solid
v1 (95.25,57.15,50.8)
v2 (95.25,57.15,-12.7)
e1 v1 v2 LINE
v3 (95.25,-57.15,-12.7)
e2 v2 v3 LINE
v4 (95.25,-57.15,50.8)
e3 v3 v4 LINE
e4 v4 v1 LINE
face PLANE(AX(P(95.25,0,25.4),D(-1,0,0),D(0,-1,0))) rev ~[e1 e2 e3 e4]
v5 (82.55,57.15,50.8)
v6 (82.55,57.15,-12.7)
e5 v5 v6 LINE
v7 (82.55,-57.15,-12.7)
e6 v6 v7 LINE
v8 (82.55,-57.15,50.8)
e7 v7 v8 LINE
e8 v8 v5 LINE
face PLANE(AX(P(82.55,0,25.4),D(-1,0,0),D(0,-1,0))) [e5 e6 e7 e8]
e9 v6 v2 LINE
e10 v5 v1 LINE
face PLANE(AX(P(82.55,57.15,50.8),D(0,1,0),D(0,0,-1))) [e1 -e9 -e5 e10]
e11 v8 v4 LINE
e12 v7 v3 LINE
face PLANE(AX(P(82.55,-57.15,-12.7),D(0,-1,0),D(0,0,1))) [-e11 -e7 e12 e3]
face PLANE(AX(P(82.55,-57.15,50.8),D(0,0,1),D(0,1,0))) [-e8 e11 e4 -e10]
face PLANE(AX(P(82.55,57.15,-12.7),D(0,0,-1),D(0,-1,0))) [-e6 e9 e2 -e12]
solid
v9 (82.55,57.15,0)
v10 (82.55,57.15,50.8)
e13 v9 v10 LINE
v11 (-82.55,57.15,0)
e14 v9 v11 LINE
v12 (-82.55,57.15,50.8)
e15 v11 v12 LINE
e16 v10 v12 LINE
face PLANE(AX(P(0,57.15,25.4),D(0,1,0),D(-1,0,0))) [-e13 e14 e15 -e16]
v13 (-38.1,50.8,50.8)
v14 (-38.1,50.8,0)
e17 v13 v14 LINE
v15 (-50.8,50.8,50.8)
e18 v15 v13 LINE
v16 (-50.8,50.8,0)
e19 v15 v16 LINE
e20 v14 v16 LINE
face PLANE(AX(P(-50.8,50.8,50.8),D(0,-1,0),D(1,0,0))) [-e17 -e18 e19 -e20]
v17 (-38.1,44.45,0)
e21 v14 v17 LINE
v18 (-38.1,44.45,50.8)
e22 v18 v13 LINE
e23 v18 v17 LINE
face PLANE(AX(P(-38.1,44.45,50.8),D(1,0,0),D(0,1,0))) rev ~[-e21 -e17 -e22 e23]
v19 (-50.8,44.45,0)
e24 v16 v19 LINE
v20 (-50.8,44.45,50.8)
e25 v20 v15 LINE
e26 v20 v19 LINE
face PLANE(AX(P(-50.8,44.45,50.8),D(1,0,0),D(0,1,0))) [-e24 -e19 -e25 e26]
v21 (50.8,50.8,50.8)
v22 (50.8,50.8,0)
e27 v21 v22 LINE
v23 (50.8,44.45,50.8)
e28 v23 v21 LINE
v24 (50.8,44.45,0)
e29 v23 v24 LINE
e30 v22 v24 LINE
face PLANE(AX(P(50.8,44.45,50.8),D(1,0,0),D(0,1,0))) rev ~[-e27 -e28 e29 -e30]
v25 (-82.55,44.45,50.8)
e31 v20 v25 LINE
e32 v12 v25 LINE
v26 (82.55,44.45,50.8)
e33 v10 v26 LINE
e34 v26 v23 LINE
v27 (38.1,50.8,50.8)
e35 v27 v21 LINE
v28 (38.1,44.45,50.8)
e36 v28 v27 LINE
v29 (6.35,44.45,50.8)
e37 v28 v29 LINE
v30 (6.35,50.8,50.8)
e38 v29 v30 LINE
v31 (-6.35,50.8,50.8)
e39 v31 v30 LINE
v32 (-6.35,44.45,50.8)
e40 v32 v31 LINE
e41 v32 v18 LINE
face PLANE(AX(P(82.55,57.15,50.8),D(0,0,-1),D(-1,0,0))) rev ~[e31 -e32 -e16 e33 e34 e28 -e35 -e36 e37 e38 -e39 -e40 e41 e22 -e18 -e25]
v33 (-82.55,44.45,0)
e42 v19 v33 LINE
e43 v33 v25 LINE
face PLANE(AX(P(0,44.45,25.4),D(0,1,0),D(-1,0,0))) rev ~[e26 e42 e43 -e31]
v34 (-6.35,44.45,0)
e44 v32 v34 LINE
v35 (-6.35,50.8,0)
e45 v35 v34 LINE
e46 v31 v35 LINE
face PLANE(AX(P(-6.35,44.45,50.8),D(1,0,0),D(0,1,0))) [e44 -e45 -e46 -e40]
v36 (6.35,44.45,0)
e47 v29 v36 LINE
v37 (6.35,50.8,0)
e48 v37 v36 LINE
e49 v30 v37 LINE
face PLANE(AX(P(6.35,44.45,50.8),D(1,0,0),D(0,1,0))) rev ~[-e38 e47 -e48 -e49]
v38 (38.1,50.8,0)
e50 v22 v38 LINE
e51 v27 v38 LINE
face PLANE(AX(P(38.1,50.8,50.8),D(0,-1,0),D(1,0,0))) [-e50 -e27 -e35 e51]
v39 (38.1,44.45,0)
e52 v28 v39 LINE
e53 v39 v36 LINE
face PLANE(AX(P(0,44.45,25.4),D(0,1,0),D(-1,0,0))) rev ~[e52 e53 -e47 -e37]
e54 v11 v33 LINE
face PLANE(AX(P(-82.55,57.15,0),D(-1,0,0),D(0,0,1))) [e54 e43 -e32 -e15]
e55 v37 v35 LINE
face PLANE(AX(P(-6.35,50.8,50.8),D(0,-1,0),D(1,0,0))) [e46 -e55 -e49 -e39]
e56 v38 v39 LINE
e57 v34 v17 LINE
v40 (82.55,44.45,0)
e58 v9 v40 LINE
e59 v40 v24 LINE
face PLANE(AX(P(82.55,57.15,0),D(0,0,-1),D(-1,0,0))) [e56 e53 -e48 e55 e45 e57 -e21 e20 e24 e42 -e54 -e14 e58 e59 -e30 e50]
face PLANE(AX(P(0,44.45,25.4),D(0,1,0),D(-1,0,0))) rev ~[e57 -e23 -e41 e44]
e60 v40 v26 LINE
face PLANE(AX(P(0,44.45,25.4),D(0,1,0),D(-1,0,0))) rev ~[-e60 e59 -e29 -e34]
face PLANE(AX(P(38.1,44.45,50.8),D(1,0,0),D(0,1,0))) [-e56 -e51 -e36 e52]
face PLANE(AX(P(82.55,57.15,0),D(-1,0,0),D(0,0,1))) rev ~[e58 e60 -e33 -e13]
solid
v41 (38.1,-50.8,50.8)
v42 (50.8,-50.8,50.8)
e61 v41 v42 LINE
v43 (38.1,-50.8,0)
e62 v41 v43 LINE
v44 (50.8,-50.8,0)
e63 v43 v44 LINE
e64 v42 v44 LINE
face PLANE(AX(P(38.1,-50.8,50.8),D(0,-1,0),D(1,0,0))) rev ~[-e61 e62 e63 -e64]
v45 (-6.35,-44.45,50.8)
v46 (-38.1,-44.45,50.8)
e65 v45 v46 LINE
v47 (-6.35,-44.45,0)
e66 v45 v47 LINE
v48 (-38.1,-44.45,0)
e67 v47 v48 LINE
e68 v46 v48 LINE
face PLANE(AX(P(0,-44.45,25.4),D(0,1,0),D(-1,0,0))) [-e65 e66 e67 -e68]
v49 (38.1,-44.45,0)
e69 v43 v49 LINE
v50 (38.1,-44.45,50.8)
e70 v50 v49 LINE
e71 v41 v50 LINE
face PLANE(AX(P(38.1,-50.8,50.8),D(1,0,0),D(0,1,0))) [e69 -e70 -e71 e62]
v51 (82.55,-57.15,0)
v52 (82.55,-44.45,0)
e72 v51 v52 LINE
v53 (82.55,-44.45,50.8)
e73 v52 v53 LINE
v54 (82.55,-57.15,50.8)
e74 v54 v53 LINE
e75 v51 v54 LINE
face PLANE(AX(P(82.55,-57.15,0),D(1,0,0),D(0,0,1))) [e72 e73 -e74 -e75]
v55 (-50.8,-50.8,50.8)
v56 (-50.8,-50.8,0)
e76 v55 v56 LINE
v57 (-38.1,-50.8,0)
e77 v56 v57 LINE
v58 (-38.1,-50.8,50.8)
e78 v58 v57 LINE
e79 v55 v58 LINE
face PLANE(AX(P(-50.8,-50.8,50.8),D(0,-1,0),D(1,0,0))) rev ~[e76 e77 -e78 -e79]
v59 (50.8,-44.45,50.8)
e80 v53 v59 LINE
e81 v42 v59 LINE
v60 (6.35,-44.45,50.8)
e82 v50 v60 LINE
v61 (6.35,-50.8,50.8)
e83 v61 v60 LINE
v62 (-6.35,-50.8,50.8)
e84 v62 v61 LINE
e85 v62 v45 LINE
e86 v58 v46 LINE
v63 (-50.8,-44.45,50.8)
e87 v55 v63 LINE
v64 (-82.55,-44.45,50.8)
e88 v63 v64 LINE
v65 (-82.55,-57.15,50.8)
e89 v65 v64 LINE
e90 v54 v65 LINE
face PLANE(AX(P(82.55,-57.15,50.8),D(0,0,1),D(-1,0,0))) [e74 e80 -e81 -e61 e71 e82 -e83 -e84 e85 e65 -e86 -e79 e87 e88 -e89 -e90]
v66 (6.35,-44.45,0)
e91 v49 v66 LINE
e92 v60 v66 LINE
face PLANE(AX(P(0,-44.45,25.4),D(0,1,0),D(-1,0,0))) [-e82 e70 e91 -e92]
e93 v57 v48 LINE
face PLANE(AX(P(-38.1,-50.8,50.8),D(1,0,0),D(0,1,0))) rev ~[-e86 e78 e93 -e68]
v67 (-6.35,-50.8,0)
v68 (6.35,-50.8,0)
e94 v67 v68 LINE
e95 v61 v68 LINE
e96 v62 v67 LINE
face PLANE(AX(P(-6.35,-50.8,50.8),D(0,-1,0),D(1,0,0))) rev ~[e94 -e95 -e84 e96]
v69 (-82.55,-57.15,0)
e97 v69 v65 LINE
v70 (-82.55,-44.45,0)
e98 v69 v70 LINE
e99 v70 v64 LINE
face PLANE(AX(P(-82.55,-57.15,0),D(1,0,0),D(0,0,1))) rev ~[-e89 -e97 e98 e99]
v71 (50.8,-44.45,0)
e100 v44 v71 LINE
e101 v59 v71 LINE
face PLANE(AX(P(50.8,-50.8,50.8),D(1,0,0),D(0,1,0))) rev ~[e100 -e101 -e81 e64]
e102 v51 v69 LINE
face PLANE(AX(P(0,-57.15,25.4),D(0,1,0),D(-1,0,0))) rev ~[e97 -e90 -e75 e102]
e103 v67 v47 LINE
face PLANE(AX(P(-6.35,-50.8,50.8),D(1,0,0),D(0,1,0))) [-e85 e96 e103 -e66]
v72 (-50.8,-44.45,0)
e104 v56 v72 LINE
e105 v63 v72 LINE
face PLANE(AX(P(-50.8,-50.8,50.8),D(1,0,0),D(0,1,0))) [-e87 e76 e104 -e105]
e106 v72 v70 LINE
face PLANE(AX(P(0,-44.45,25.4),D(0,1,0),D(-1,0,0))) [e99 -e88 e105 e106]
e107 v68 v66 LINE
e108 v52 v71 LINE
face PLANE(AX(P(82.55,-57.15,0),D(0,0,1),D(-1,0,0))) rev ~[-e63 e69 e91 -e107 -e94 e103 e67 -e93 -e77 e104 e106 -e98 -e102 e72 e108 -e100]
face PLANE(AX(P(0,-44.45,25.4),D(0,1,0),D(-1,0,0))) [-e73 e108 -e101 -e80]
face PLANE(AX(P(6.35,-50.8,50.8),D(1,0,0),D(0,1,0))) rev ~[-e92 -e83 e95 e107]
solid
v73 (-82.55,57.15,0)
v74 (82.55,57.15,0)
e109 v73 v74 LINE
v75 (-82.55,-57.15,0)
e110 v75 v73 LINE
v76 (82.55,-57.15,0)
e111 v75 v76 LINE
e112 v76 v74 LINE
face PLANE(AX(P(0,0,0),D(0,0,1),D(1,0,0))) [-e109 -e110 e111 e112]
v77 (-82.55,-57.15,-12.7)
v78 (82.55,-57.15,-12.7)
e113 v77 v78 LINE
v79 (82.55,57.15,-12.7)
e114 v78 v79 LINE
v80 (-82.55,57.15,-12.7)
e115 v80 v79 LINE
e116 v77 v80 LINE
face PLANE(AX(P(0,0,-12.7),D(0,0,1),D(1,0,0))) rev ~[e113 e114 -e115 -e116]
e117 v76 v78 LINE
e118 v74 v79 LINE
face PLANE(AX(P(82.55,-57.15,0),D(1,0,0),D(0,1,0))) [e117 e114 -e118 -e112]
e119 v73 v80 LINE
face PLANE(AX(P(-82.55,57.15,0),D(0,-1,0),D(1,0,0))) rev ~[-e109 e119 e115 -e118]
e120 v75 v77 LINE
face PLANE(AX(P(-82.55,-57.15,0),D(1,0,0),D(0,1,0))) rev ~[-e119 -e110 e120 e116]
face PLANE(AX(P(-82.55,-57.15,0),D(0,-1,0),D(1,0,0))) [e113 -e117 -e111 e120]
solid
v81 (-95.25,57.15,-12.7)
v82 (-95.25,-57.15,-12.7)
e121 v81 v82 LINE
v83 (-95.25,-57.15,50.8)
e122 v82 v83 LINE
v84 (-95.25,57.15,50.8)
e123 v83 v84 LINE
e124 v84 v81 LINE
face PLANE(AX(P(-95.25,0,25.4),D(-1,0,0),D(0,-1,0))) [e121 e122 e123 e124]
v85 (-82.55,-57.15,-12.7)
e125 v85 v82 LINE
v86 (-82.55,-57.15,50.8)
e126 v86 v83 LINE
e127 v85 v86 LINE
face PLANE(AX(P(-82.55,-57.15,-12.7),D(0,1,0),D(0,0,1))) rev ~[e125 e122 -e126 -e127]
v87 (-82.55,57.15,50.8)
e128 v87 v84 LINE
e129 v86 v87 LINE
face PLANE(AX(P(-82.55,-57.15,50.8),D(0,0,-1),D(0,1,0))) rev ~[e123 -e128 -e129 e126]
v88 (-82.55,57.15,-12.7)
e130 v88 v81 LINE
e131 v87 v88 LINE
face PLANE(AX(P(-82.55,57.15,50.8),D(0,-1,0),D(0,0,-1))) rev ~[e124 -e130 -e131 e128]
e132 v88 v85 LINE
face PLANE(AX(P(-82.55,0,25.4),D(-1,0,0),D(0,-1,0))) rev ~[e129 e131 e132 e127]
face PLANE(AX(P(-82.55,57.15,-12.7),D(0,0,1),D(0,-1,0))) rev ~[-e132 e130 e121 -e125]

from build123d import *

# Parameters (mm, degrees)
F2_W      = 165.1
F2_H      = 50.8
F3_DEPTH  = 12.7
F0_W      = 165.1
F0_H      = 114.3
F4_DEPTH  = 12.7
F6_W      = 165.1
F6_H      = 50.8
F7_DEPTH  = 12.7
F9_W      = 88.9
F9_H      = 50.8
F9_W_2    = 12.7
F10_DEPTH = 12.7
F12_W     = 88.9
F12_H     = 50.8
F12_W_2   = 12.7
F13_DEPTH = 12.7
F14_W     = 12.7
F14_H     = 6.35
F15_DEPTH = 63.5
F16_W     = 12.7
F16_H     = 6.35
F17_DEPTH = 63.5


with BuildPart() as f3:
    # F2 (on line) → F3 (new body)
    with BuildSketch(Plane(origin=(0, 57.15, 0), x_dir=(-1, 0, 0), z_dir=(0, 1, 0))):
        with Locations((0, 25.4)):
            Rectangle(F2_W, F2_H)
    extrude(amount=-F3_DEPTH)

    # F14 (on face) → F15 (cut)
    with BuildSketch(Plane.XY.offset(50.8)):
        with Locations((-44.45, 47.625)):
            Rectangle(F14_W, F14_H)
        with Locations((0, 47.625)):
            Rectangle(F14_W, F14_H)
        with Locations((44.45, 47.625)):
            Rectangle(F14_W, F14_H)
    extrude(amount=-F15_DEPTH, mode=Mode.SUBTRACT)


with BuildPart() as f4:
    # F0 (on Top) → F4 (new body)
    with BuildSketch(Plane.XY):
        Rectangle(F0_W, F0_H)
    extrude(amount=-F4_DEPTH)


with BuildPart() as f7:
    # F6 (on face) → F7 (new body)
    with BuildSketch(Plane(origin=(0, -57.15, 0), x_dir=(-1, 0, 0), z_dir=(0, 1, 0))):
        with Locations((0, 25.4)):
            Rectangle(F6_W, F6_H)
    extrude(amount=F7_DEPTH)

    # F16 (on face) → F17 (cut)
    with BuildSketch(Plane.XY.offset(50.8)):
        with Locations((44.45, -47.625)):
            Rectangle(F16_W, F16_H)
        with Locations((0, -47.625)):
            Rectangle(F16_W, F16_H)
        with Locations((-44.45, -47.625)):
            Rectangle(F16_W, F16_H)
    extrude(amount=-F17_DEPTH, mode=Mode.SUBTRACT)


with BuildPart() as f10:
    # F9 (on face) → F10 (new body)
    with BuildSketch(Plane(origin=(82.55, 0, 0), x_dir=(0, -1, 0), z_dir=(-1, 0, 0))):
        with Locations((0, 25.4)):
            Rectangle(F9_W, F9_H)
        with Locations((50.8, 25.4)):
            Rectangle(F9_W_2, F9_H)
        with Locations((-50.8, 25.4)):
            Rectangle(F9_W_2, F9_H)
        Polygon((57.15, -12.7), (57.15, 0), (44.45, 0), (-44.45, 0), (-57.15, 0), (-57.15, -12.7), align=None)
    extrude(amount=-F10_DEPTH)


with BuildPart() as f13:
    # F12 (on face) → F13 (new body)
    with BuildSketch(Plane(origin=(-82.55, 0, 0), x_dir=(0, -1, 0), z_dir=(-1, 0, 0))):
        with Locations((0, 25.4)):
            Rectangle(F12_W, F12_H)
        with Locations((50.8, 25.4)):
            Rectangle(F12_W_2, F12_H)
        Polygon((-44.45, 0), (-57.15, 0), (-57.15, -12.7), (57.15, -12.7), (57.15, 0), (44.45, 0), align=None)
        with Locations((-50.8, 25.4)):
            Rectangle(F12_W_2, F12_H)
    extrude(amount=F13_DEPTH)


solid = Compound([f3.part, f4.part, f7.part, f10.part, f13.part])
